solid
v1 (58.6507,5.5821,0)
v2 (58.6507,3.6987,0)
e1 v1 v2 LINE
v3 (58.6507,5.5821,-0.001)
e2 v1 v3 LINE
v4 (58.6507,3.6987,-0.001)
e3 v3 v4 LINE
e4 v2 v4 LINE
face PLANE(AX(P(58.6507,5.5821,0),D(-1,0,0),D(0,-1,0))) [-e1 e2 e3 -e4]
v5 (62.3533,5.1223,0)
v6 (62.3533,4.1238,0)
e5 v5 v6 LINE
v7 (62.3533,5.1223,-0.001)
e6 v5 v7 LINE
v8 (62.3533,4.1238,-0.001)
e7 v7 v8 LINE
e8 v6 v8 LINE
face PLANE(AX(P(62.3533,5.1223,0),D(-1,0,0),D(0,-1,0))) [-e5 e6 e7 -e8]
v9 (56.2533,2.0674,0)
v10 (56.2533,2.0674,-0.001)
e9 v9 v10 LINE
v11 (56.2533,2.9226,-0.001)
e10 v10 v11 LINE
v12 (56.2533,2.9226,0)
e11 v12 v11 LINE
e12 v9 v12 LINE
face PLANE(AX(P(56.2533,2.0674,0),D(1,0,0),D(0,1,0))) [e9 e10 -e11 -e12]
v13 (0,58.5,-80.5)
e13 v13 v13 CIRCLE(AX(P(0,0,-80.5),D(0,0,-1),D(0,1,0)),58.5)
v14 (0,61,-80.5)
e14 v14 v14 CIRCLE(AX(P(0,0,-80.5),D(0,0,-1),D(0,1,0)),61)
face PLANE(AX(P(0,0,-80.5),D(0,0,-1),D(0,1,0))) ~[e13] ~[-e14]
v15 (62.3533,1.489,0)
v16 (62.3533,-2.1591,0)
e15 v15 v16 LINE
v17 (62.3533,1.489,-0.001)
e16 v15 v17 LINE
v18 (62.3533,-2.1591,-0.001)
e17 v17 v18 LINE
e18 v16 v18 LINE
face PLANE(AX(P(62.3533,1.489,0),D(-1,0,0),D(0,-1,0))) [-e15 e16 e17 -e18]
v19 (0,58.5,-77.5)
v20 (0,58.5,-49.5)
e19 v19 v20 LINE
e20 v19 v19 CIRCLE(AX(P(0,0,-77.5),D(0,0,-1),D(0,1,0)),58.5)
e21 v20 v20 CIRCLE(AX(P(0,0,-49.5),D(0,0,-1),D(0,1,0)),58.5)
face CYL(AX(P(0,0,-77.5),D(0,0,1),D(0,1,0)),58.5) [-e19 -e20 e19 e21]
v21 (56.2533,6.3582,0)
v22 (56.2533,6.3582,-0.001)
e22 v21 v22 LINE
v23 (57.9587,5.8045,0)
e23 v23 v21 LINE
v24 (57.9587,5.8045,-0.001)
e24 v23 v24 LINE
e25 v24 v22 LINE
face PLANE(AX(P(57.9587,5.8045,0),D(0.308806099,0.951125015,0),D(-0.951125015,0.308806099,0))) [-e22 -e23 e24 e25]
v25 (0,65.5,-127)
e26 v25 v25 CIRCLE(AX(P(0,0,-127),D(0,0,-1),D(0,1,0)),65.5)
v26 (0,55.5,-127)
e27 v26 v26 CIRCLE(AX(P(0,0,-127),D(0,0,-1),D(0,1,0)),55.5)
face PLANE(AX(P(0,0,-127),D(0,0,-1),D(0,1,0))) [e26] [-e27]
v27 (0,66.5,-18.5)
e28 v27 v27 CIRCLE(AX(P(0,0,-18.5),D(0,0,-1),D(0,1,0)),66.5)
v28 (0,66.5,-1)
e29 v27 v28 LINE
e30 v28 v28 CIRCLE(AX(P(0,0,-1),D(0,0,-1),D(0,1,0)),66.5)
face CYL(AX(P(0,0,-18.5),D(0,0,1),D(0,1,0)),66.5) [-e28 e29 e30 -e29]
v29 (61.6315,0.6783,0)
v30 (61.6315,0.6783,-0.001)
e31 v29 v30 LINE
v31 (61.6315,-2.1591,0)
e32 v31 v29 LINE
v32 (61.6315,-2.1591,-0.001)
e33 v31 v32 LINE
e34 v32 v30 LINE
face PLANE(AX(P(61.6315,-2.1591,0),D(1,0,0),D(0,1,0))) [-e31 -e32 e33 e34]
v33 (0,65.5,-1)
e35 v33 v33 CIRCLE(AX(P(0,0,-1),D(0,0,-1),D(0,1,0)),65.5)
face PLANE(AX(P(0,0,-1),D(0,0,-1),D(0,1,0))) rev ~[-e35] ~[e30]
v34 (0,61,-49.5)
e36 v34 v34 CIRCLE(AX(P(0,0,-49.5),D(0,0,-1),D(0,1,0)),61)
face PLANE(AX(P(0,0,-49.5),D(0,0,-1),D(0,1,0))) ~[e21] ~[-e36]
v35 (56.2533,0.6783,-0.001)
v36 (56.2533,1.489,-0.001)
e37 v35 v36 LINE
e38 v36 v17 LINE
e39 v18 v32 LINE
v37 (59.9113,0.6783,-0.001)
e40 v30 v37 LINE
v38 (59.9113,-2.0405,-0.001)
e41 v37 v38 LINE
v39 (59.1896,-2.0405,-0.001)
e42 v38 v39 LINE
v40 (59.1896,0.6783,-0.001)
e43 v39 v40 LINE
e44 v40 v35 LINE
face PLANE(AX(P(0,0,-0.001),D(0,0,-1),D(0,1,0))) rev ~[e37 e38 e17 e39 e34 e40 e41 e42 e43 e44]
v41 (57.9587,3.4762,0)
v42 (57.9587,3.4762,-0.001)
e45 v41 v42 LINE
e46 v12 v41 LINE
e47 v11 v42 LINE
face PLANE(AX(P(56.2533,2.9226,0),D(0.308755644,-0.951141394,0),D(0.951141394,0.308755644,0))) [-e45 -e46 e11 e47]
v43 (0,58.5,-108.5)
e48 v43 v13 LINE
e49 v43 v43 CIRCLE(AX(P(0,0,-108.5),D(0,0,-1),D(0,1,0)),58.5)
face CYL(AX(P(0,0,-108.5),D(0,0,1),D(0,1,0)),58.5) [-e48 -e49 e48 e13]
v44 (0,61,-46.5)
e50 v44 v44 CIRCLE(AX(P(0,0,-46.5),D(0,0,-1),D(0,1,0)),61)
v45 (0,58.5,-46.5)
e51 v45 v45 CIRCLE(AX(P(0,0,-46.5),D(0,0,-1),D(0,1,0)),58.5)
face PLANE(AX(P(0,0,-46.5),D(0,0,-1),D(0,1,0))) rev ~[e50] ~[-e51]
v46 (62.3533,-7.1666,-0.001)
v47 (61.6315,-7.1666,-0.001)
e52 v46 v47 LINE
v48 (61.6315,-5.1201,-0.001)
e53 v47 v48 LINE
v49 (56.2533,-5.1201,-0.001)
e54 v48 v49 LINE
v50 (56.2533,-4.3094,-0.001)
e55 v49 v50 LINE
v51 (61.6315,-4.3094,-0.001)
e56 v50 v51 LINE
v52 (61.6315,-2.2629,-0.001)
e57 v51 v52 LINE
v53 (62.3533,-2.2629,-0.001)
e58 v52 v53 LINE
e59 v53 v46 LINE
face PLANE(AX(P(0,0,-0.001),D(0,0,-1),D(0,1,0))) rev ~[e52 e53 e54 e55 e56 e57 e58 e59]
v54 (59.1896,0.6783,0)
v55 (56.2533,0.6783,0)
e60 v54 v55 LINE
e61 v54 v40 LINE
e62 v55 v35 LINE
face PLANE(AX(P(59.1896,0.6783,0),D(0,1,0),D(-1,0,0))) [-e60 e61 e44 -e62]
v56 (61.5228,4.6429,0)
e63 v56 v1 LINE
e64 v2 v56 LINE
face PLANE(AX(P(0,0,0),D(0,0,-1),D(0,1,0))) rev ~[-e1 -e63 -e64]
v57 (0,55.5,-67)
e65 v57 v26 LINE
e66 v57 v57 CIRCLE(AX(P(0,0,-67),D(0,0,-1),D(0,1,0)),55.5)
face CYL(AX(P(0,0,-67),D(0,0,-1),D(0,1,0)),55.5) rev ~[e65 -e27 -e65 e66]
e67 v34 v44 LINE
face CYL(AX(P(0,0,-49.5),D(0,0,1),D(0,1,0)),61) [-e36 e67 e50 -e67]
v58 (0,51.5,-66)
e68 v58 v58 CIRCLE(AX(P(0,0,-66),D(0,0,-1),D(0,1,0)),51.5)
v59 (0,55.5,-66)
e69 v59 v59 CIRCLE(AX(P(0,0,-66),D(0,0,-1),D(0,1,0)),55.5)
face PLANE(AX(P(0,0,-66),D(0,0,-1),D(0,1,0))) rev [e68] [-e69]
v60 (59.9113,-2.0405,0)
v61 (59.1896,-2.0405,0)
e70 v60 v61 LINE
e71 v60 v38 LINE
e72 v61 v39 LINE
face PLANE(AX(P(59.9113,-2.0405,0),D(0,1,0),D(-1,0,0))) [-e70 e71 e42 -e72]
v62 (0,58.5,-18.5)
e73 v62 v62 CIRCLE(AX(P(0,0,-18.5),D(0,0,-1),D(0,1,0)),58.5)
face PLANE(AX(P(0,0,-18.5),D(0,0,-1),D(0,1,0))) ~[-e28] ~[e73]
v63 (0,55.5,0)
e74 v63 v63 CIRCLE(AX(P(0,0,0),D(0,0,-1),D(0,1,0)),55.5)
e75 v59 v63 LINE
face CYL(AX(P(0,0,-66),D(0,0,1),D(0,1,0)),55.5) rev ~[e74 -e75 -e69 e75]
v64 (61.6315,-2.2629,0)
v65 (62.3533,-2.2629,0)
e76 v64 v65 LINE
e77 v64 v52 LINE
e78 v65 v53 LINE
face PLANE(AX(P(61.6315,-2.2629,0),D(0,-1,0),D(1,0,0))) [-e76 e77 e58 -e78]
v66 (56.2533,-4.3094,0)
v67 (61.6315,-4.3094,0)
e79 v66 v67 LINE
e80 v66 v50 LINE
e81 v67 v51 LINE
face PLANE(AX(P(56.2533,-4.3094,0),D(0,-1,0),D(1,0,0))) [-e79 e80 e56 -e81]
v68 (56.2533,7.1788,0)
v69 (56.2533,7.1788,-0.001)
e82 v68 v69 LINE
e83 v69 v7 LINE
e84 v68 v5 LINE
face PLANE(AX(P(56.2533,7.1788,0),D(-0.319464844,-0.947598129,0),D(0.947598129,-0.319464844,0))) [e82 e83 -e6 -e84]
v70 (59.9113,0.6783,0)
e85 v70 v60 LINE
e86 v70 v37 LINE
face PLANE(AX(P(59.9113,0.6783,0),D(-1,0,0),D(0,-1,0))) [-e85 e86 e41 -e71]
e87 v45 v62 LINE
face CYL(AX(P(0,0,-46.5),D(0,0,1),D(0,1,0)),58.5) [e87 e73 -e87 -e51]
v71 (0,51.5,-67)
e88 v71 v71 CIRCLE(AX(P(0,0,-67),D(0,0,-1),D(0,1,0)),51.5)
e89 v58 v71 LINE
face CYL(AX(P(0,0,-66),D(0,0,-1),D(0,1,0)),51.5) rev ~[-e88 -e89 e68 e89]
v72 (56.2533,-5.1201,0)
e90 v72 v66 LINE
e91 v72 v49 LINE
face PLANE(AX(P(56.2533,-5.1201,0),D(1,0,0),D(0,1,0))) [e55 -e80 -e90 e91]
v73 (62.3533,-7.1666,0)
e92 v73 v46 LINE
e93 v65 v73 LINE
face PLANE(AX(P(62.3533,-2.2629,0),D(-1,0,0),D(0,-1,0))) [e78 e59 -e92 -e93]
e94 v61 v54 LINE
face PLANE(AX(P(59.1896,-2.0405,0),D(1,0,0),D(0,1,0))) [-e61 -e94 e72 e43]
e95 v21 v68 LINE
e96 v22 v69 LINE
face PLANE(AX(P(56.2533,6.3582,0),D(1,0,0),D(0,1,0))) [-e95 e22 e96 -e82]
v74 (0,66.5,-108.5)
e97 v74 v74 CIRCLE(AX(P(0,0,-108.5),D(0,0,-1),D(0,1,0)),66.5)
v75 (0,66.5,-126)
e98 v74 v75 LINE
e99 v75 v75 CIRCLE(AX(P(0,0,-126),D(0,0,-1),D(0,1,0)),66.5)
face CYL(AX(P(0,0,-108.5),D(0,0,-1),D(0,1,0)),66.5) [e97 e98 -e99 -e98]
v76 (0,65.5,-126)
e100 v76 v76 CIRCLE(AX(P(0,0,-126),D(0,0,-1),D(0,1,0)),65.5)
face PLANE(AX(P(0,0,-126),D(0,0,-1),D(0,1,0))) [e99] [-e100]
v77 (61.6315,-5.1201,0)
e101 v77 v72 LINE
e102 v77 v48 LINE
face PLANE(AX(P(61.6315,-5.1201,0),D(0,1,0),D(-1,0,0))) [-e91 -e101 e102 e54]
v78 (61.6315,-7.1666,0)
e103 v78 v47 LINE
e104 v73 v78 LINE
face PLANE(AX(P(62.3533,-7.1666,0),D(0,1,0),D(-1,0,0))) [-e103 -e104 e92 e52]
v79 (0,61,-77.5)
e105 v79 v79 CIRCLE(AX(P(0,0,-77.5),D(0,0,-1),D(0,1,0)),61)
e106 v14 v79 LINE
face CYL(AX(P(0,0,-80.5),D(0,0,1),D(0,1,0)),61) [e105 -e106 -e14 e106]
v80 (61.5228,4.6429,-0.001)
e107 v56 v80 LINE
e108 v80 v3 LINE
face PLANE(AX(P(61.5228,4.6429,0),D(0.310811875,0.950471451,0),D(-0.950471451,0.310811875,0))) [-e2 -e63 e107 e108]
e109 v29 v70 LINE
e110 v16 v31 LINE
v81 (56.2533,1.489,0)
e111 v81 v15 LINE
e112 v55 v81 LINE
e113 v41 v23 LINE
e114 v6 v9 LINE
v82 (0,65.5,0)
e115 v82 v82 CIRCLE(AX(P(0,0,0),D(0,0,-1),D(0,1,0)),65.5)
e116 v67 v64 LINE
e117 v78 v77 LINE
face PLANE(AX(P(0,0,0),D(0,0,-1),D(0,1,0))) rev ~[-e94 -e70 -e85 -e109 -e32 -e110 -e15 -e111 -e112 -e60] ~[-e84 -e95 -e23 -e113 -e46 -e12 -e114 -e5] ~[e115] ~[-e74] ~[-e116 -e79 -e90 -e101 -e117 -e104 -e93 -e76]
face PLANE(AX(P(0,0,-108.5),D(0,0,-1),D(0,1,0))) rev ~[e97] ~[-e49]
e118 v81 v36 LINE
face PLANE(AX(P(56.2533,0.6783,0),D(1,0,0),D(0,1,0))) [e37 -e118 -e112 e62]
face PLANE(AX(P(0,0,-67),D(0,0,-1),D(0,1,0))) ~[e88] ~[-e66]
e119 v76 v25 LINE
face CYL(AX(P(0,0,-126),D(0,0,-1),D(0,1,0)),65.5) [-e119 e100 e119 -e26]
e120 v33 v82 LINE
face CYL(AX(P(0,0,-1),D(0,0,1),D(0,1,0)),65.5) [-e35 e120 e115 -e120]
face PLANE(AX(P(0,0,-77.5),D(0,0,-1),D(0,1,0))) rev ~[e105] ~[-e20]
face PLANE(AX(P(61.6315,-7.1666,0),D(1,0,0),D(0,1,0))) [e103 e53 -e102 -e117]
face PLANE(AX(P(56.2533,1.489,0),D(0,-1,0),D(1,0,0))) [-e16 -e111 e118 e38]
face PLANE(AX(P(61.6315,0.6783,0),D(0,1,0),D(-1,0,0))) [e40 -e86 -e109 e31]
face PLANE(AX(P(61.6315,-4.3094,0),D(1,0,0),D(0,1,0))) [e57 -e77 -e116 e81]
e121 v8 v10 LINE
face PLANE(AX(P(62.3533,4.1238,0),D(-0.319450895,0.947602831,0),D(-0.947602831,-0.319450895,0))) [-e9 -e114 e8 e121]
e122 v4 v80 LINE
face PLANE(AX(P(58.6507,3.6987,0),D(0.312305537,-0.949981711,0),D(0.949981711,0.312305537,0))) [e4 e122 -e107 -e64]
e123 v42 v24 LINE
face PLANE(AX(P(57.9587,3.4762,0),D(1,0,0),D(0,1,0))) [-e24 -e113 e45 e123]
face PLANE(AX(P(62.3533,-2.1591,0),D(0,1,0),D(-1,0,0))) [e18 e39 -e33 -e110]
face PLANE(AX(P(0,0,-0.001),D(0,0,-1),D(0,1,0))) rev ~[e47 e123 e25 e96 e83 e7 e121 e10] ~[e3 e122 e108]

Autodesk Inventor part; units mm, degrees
ref_plane "YZ Plane" through (0, 0, 0) normal (1, 0, 0) x (0, 1, 0)
ref_plane "XZ Plane" through (0, 0, 0) normal (0, 1, 0) x (-1, 0, 0)
ref_plane "XY Plane" through (0, 0, 0) normal (0, 0, 1) x (1, 0, 0)
sketch "Sketch1" plane through (0, 0, 0) normal (1, 0, 0) x (0, 1, 0)
  line L0 (0, 0) -> (0, -141.6259) construction
  line L1 (-13.3, 0) -> (79.8, 0) construction
  line L2 (55.5, -66.5) -> (25.7904, -66.5) construction
  line L3 (51.5, -66) -> (51.5, -67)
  line L4 (51.5, -66) -> (55.5, -66)
  line L5 (55.5, -66) -> (55.5, 0)
  line L6 (51.5, -67) -> (55.5, -67)
  line L7 (55.5, -67) -> (55.5, -127)
  line L8 (66.5, -108.5) -> (58.5, -108.5)
  line L9 (58.5, -108.5) -> (58.5, -80.5)
  line L10 (58.5, -80.5) -> (61, -80.5)
  line L11 (61, -80.5) -> (61, -77.5)
  line L12 (61, -77.5) -> (58.5, -77.5)
  line L13 (58.5, -77.5) -> (58.5, -49.5)
  line L14 (58.5, -49.5) -> (61, -49.5)
  line L15 (61, -49.5) -> (61, -46.5)
  line L16 (61, -46.5) -> (58.5, -46.5)
  line L17 (58.5, -46.5) -> (58.5, -18.5)
  line L18 (58.5, -18.5) -> (66.5, -18.5)
  line L19 (66.5, -18.5) -> (66.5, -1)
  line L20 (66.5, -1) -> (65.5, -1)
  line L21 (65.5, -1) -> (65.5, 0)
  line L22 (65.5, 0) -> (55.5, 0)
  line L23 (66.5, -108.5) -> (66.5, -126)
  line L24 (66.5, -126) -> (65.5, -126)
  line L25 (65.5, -126) -> (65.5, -127)
  line L26 (65.5, -127) -> (55.5, -127)
  point P0 (51.5, -66.5)
  dimension "d2" = 1
  dimension "d3" = 103
  dimension "d4" = 66
  dimension "d5" = 111
  dimension "d6" = 60
  dimension "d9" = 8
  dimension "d10" = 28
  dimension "d11" = 2.5
  dimension "d12" = 3
  dimension "d13" = 28
  dimension "d14" = 2.5
  dimension "d15" = 3
  dimension "d16" = 28
  dimension "d17" = 8
  dimension "d19" = 17.5
  dimension "d20" = 1
  dimension "d21" = 17.5
  dimension "d22" = 1
  dimension "d23" = 3
  dimension "d24" = 1
  dimension "d25" = 1
revolve "Revolution1" add sketch "Sketch1" angle 360 about axis through (0, 0, 0) along (0, 0, -1)
sketch "Sketch2" plane through (0, 0, 0) normal (0, 0, 1) x (1, 0, 0)
  line L0 (62.3533, 7.1392) -> (62.3533, -1.0719) construction
  line L1 (62.3533, -1.0719) -> (58.8533, -1.0719) construction
  line L2 (58.8533, -1.0719) -> (58.8533, 7.1392) construction
  line L3 (58.8533, 7.1392) -> (62.3533, 7.1392) construction
  line L4 (56.2533, 7.1788) -> (62.3533, 5.1223)
  line L5 (62.3533, 5.1223) -> (62.3533, 4.1238)
  line L6 (62.3533, 4.1238) -> (56.2533, 2.0674)
  line L7 (56.2533, 2.0674) -> (56.2533, 2.9226)
  line L8 (56.2533, 2.9226) -> (57.9587, 3.4762)
  line L9 (57.9587, 3.4762) -> (57.9587, 5.8045)
  line L10 (57.9587, 5.8045) -> (56.2533, 6.3582)
  line L11 (56.2533, 6.3582) -> (56.2533, 7.1788)
  line L12 (58.6507, 3.6987) -> (61.5228, 4.6429)
  line L13 (61.5228, 4.6429) -> (58.6507, 5.5821)
  line L14 (58.6507, 5.5821) -> (58.6507, 3.6987)
  line L15 (61.6315, -2.1591) -> (61.6315, 0.6783)
  line L16 (61.6315, 0.6783) -> (59.9113, 0.6783)
  line L17 (59.9113, 0.6783) -> (59.9113, -2.0405)
  line L18 (59.9113, -2.0405) -> (59.1896, -2.0405)
  line L19 (59.1896, -2.0405) -> (59.1896, 0.6783)
  line L20 (59.1896, 0.6783) -> (56.2533, 0.6783)
  line L21 (56.2533, 0.6783) -> (56.2533, 1.489)
  line L22 (56.2533, 1.489) -> (62.3533, 1.489)
  line L23 (62.3533, 1.489) -> (62.3533, -2.1591)
  line L24 (62.3533, -2.1591) -> (61.6315, -2.1591)
  line L25 (56.2533, -4.3094) -> (61.6315, -4.3094)
  line L26 (61.6315, -4.3094) -> (61.6315, -2.2629)
  line L27 (61.6315, -2.2629) -> (62.3533, -2.2629)
  line L28 (62.3533, -2.2629) -> (62.3533, -7.1666)
  line L29 (62.3533, -7.1666) -> (61.6315, -7.1666)
  line L30 (61.6315, -7.1666) -> (61.6315, -5.1201)
  line L31 (61.6315, -5.1201) -> (56.2533, -5.1201)
  line L32 (56.2533, -5.1201) -> (56.2533, -4.3094)
  point P0 (0, 0)
emboss "Emboss1" sketch "Sketch2" operation cut depth 0.001 direction (0, 0, -1)
equation "\"d22\" = d20"
equation "\"d24\" = d20"
equation "\"d25\" = d24"
properties part number "doubleSocketPipe" material "PVC-Piping"
